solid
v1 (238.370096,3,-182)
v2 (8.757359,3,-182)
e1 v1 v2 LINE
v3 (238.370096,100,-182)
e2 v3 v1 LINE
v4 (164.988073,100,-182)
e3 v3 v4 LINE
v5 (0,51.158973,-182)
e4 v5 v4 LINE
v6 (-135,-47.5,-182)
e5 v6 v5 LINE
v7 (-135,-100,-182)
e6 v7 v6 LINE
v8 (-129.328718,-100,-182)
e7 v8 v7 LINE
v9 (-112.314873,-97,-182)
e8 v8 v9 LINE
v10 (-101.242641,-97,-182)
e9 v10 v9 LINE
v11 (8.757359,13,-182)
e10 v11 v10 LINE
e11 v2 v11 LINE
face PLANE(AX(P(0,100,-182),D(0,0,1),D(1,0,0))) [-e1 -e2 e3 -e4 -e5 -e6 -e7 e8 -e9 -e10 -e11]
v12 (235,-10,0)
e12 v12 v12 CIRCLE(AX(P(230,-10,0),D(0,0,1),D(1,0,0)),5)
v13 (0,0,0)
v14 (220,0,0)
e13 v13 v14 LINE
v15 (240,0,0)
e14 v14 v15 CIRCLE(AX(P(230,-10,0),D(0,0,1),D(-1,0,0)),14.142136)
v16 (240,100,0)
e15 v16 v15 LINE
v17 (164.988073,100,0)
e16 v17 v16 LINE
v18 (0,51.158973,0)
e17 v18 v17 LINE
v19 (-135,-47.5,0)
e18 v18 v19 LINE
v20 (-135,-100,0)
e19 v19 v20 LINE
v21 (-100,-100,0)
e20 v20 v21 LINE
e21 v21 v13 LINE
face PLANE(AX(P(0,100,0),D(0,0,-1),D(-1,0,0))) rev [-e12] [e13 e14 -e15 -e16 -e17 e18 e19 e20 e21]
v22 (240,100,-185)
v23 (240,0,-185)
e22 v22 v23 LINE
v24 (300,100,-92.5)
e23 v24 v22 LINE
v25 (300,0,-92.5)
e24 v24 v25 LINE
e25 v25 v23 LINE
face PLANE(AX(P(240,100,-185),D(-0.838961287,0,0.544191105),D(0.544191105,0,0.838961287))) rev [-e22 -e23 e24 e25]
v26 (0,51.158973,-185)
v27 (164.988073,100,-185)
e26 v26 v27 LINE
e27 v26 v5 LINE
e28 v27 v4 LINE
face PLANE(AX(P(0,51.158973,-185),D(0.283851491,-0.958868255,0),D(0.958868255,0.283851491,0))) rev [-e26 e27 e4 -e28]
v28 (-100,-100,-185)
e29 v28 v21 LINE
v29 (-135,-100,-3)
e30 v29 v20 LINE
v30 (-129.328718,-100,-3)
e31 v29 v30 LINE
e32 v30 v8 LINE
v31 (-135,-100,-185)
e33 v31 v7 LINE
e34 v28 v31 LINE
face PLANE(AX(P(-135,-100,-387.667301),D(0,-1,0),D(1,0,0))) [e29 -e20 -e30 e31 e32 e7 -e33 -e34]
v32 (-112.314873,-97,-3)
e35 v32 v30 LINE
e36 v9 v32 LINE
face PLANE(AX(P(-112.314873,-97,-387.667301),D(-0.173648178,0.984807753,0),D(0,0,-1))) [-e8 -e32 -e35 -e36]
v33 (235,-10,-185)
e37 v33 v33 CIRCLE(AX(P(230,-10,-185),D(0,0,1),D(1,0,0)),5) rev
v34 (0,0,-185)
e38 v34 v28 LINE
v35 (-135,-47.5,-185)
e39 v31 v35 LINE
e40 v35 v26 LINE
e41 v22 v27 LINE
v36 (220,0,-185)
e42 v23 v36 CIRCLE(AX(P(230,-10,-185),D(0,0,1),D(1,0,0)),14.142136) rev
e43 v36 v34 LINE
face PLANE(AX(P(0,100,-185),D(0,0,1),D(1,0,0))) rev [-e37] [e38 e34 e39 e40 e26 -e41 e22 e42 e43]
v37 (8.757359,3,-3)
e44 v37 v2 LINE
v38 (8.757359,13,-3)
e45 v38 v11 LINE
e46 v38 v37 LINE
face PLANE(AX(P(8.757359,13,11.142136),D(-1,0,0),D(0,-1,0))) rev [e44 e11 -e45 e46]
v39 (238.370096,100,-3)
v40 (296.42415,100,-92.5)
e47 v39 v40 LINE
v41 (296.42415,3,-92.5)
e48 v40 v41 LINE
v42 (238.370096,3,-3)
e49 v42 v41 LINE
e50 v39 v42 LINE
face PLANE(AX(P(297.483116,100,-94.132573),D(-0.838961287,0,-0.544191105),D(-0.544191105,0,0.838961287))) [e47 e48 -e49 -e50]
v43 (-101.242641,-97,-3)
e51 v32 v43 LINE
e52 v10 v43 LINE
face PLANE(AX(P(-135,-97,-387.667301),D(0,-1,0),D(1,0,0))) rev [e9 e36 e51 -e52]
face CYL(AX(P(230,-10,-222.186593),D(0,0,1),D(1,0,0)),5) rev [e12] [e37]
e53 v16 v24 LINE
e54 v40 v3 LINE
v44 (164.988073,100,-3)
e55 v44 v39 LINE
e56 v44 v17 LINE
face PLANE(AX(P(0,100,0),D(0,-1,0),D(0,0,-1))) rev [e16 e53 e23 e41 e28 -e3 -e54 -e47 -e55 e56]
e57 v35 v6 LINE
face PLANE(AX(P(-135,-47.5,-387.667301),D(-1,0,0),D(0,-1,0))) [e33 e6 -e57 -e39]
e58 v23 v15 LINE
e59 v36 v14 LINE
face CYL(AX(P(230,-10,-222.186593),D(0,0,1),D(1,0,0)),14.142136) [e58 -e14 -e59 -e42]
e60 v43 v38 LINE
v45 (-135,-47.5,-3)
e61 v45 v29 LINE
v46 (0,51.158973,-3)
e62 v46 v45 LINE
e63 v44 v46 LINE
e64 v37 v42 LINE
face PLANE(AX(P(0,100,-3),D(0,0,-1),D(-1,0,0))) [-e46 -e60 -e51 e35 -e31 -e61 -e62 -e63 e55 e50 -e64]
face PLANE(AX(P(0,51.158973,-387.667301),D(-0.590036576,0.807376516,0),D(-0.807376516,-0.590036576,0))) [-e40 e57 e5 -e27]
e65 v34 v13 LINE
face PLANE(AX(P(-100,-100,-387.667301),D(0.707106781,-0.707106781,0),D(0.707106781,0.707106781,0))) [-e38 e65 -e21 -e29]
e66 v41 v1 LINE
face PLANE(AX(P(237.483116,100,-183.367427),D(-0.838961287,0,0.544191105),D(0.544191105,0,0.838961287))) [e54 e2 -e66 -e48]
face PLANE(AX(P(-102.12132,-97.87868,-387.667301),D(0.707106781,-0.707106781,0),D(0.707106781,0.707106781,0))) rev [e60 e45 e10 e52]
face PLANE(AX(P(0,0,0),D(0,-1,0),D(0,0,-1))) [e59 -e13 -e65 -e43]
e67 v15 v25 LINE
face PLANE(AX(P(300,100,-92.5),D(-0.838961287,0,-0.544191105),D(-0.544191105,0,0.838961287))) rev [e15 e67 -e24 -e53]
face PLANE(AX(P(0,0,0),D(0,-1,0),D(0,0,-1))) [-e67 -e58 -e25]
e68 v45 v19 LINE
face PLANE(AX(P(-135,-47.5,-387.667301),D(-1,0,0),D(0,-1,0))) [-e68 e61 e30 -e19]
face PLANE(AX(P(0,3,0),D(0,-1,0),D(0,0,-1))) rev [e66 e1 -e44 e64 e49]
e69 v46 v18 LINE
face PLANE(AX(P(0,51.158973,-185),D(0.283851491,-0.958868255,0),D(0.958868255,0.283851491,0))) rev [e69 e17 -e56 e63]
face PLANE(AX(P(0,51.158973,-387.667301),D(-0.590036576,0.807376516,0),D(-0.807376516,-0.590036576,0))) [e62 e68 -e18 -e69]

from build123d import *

# Parameters (mm, degrees)
BOSS_EXTRUDE1_DEPTH = 100
SHELL1_T            = -3
SKETCH2_W           = 3
SKETCH2_H           = 179
CUT_EXTRUDE1_DEPTH  = 97
CUT_EXTRUDE2_DEPTH  = 367.367302034
SKETCH4_R           = 5
BOSS_EXTRUDE2_DEPTH = 185
BOSS_EXTRUDE3_REACH = 368.367
SHELL2_START        = -182
SHELL2_DEPTH        = 179
SKETCH6_W           = 8.912859495
SKETCH6_H           = 179
CUT_EXTRUDE3_DEPTH  = 10
CHAMFER1_SIZE       = 4
CHAMFER1_SIZE_2     = 22.685127278
BOSS_EXTRUDE4_REACH = 366.862


# Read off the part's stored shape, not the designer's step: Shell2
with BuildPart() as part:
    # Sketch1 → Boss-Extrude1 (new body)
    with BuildSketch(Plane(origin=(0, 0, 0), x_dir=(1, 0, 0), z_dir=(0, 1, 0))):
        Polygon((240, 185), (300, 92.5), (240, 0), (0, 0), (0, 185), align=None)
    extrude(amount=BOSS_EXTRUDE1_DEPTH)

    # Shell1
    shell1_openings = [part.faces().sort_by_distance(p)[0] for p in [
        (135.555555556, 100, -92.5),
    ]]
    offset(amount=SHELL1_T, openings=shell1_openings, kind=Kind.INTERSECTION)

    # Sketch2 → Cut-Extrude1 (cut)
    with BuildSketch(Plane(origin=(0, 100, 0), x_dir=(1, 0, 0), z_dir=(0, 1, 0))):
        with Locations((1.5, 92.5)):
            Rectangle(SKETCH2_W, SKETCH2_H)
    extrude(amount=-CUT_EXTRUDE1_DEPTH, mode=Mode.SUBTRACT)

    # Sketch3 → Cut-Extrude2 (cut, through all)
    with BuildSketch(Plane.XY):
        Polygon((0, 100), (0, 51.158972719), (164.988073302, 100), align=None)
    extrude(amount=-CUT_EXTRUDE2_DEPTH, mode=Mode.SUBTRACT)

    # Sketch4 → Boss-Extrude2 (add)
    with BuildSketch(Plane.XY):
        with BuildLine():
            Line((220, 0), (240, 0))
            ThreePointArc((240, 0), (230, -24.142135624), (220, 0))
        make_face()
        with Locations((230, -10)):
            Circle(SKETCH4_R, mode=Mode.SUBTRACT)
    extrude(amount=-BOSS_EXTRUDE2_DEPTH)

    # Boss-Extrude3: up to this face of the body (flat: up to its plane)
    boss_extrude3_end = Plane(part.part.faces().sort_by_distance((135.447130894, 41.883724311, -185))[0])
    # Sketch5 → Boss-Extrude3 (add, up to the picked face)
    with BuildSketch(Plane.XY, mode=Mode.PRIVATE) as boss_extrude3_sk1:
        Polygon((0, 51.158972719), (-135, -47.5), (-135, -100), (-100, -100), (0, 0), align=None)
    boss_extrude3_tool1 = split(extrude(boss_extrude3_sk1.sketch, amount=-BOSS_EXTRUDE3_REACH, mode=Mode.PRIVATE), bisect_by=boss_extrude3_end, keep=Keep.BOTH, mode=Mode.PRIVATE)
    add(boss_extrude3_tool1.solids().sort_by(Axis((-69.900259, -32.775799, 0), (0, 0, -1)))[0])

    # Shell2 outline → Shell2 (cut)
    with BuildSketch(Plane.XY.offset(SHELL2_START)):
        Polygon((0, 48.030284306), (-7.196033451, 45.900059624), (-135, -47.5), (-135, -97), (-101.242640687, -97), (-1.242640687, 3), (0, 3), align=None)
    extrude(amount=SHELL2_DEPTH, mode=Mode.SUBTRACT)

    # Sketch6 → Cut-Extrude3 (cut)
    with BuildSketch(Plane(origin=(-24.371197118, 33.348326263, 0), x_dir=(0.8073765164894111, 0.5900365756641057, 0), z_dir=(-0.5900365756641056, 0.8073765164894111, 0))):
        with Locations((25.729235331, 92.5)):
            Rectangle(SKETCH6_W, SKETCH6_H)
    extrude(amount=-CUT_EXTRUDE3_DEPTH, mode=Mode.SUBTRACT)

    # Chamfer1
    # the kernel refuses this chamfer: 22.685127278, 4 mm, written as the material it takes off along each edge
    with BuildSketch(Plane(origin=(-135, -97, -182), x_dir=(-0.21013876076735197, -0.9776715712462758, 0), z_dir=(0, 0, 1))) as chamfer1_piece_1:
        Polygon((CHAMFER1_SIZE * 0.977671571246, CHAMFER1_SIZE * 0.210138760767), (-CHAMFER1_SIZE_2 * 0.210138760772, CHAMFER1_SIZE_2 * 0.977671571267), (0, 0), align=None)
    extrude(amount=179, mode=Mode.SUBTRACT)

    # Sketch8 → Boss-Extrude4 (add, up to next)
    with BuildSketch(Plane.XY.offset(-182), mode=Mode.PRIVATE) as boss_extrude4_sk1:
        Polygon((-1.242640687, 3), (8.757359313, 13), (8.757359313, 3), align=None)
    boss_extrude4_tool1 = extrude(boss_extrude4_sk1.sketch, amount=BOSS_EXTRUDE4_REACH, mode=Mode.PRIVATE) - part.part
    add(boss_extrude4_tool1.solids().sort_by_distance((5.424026, 6.333333, -182))[0])


solid = part.part
